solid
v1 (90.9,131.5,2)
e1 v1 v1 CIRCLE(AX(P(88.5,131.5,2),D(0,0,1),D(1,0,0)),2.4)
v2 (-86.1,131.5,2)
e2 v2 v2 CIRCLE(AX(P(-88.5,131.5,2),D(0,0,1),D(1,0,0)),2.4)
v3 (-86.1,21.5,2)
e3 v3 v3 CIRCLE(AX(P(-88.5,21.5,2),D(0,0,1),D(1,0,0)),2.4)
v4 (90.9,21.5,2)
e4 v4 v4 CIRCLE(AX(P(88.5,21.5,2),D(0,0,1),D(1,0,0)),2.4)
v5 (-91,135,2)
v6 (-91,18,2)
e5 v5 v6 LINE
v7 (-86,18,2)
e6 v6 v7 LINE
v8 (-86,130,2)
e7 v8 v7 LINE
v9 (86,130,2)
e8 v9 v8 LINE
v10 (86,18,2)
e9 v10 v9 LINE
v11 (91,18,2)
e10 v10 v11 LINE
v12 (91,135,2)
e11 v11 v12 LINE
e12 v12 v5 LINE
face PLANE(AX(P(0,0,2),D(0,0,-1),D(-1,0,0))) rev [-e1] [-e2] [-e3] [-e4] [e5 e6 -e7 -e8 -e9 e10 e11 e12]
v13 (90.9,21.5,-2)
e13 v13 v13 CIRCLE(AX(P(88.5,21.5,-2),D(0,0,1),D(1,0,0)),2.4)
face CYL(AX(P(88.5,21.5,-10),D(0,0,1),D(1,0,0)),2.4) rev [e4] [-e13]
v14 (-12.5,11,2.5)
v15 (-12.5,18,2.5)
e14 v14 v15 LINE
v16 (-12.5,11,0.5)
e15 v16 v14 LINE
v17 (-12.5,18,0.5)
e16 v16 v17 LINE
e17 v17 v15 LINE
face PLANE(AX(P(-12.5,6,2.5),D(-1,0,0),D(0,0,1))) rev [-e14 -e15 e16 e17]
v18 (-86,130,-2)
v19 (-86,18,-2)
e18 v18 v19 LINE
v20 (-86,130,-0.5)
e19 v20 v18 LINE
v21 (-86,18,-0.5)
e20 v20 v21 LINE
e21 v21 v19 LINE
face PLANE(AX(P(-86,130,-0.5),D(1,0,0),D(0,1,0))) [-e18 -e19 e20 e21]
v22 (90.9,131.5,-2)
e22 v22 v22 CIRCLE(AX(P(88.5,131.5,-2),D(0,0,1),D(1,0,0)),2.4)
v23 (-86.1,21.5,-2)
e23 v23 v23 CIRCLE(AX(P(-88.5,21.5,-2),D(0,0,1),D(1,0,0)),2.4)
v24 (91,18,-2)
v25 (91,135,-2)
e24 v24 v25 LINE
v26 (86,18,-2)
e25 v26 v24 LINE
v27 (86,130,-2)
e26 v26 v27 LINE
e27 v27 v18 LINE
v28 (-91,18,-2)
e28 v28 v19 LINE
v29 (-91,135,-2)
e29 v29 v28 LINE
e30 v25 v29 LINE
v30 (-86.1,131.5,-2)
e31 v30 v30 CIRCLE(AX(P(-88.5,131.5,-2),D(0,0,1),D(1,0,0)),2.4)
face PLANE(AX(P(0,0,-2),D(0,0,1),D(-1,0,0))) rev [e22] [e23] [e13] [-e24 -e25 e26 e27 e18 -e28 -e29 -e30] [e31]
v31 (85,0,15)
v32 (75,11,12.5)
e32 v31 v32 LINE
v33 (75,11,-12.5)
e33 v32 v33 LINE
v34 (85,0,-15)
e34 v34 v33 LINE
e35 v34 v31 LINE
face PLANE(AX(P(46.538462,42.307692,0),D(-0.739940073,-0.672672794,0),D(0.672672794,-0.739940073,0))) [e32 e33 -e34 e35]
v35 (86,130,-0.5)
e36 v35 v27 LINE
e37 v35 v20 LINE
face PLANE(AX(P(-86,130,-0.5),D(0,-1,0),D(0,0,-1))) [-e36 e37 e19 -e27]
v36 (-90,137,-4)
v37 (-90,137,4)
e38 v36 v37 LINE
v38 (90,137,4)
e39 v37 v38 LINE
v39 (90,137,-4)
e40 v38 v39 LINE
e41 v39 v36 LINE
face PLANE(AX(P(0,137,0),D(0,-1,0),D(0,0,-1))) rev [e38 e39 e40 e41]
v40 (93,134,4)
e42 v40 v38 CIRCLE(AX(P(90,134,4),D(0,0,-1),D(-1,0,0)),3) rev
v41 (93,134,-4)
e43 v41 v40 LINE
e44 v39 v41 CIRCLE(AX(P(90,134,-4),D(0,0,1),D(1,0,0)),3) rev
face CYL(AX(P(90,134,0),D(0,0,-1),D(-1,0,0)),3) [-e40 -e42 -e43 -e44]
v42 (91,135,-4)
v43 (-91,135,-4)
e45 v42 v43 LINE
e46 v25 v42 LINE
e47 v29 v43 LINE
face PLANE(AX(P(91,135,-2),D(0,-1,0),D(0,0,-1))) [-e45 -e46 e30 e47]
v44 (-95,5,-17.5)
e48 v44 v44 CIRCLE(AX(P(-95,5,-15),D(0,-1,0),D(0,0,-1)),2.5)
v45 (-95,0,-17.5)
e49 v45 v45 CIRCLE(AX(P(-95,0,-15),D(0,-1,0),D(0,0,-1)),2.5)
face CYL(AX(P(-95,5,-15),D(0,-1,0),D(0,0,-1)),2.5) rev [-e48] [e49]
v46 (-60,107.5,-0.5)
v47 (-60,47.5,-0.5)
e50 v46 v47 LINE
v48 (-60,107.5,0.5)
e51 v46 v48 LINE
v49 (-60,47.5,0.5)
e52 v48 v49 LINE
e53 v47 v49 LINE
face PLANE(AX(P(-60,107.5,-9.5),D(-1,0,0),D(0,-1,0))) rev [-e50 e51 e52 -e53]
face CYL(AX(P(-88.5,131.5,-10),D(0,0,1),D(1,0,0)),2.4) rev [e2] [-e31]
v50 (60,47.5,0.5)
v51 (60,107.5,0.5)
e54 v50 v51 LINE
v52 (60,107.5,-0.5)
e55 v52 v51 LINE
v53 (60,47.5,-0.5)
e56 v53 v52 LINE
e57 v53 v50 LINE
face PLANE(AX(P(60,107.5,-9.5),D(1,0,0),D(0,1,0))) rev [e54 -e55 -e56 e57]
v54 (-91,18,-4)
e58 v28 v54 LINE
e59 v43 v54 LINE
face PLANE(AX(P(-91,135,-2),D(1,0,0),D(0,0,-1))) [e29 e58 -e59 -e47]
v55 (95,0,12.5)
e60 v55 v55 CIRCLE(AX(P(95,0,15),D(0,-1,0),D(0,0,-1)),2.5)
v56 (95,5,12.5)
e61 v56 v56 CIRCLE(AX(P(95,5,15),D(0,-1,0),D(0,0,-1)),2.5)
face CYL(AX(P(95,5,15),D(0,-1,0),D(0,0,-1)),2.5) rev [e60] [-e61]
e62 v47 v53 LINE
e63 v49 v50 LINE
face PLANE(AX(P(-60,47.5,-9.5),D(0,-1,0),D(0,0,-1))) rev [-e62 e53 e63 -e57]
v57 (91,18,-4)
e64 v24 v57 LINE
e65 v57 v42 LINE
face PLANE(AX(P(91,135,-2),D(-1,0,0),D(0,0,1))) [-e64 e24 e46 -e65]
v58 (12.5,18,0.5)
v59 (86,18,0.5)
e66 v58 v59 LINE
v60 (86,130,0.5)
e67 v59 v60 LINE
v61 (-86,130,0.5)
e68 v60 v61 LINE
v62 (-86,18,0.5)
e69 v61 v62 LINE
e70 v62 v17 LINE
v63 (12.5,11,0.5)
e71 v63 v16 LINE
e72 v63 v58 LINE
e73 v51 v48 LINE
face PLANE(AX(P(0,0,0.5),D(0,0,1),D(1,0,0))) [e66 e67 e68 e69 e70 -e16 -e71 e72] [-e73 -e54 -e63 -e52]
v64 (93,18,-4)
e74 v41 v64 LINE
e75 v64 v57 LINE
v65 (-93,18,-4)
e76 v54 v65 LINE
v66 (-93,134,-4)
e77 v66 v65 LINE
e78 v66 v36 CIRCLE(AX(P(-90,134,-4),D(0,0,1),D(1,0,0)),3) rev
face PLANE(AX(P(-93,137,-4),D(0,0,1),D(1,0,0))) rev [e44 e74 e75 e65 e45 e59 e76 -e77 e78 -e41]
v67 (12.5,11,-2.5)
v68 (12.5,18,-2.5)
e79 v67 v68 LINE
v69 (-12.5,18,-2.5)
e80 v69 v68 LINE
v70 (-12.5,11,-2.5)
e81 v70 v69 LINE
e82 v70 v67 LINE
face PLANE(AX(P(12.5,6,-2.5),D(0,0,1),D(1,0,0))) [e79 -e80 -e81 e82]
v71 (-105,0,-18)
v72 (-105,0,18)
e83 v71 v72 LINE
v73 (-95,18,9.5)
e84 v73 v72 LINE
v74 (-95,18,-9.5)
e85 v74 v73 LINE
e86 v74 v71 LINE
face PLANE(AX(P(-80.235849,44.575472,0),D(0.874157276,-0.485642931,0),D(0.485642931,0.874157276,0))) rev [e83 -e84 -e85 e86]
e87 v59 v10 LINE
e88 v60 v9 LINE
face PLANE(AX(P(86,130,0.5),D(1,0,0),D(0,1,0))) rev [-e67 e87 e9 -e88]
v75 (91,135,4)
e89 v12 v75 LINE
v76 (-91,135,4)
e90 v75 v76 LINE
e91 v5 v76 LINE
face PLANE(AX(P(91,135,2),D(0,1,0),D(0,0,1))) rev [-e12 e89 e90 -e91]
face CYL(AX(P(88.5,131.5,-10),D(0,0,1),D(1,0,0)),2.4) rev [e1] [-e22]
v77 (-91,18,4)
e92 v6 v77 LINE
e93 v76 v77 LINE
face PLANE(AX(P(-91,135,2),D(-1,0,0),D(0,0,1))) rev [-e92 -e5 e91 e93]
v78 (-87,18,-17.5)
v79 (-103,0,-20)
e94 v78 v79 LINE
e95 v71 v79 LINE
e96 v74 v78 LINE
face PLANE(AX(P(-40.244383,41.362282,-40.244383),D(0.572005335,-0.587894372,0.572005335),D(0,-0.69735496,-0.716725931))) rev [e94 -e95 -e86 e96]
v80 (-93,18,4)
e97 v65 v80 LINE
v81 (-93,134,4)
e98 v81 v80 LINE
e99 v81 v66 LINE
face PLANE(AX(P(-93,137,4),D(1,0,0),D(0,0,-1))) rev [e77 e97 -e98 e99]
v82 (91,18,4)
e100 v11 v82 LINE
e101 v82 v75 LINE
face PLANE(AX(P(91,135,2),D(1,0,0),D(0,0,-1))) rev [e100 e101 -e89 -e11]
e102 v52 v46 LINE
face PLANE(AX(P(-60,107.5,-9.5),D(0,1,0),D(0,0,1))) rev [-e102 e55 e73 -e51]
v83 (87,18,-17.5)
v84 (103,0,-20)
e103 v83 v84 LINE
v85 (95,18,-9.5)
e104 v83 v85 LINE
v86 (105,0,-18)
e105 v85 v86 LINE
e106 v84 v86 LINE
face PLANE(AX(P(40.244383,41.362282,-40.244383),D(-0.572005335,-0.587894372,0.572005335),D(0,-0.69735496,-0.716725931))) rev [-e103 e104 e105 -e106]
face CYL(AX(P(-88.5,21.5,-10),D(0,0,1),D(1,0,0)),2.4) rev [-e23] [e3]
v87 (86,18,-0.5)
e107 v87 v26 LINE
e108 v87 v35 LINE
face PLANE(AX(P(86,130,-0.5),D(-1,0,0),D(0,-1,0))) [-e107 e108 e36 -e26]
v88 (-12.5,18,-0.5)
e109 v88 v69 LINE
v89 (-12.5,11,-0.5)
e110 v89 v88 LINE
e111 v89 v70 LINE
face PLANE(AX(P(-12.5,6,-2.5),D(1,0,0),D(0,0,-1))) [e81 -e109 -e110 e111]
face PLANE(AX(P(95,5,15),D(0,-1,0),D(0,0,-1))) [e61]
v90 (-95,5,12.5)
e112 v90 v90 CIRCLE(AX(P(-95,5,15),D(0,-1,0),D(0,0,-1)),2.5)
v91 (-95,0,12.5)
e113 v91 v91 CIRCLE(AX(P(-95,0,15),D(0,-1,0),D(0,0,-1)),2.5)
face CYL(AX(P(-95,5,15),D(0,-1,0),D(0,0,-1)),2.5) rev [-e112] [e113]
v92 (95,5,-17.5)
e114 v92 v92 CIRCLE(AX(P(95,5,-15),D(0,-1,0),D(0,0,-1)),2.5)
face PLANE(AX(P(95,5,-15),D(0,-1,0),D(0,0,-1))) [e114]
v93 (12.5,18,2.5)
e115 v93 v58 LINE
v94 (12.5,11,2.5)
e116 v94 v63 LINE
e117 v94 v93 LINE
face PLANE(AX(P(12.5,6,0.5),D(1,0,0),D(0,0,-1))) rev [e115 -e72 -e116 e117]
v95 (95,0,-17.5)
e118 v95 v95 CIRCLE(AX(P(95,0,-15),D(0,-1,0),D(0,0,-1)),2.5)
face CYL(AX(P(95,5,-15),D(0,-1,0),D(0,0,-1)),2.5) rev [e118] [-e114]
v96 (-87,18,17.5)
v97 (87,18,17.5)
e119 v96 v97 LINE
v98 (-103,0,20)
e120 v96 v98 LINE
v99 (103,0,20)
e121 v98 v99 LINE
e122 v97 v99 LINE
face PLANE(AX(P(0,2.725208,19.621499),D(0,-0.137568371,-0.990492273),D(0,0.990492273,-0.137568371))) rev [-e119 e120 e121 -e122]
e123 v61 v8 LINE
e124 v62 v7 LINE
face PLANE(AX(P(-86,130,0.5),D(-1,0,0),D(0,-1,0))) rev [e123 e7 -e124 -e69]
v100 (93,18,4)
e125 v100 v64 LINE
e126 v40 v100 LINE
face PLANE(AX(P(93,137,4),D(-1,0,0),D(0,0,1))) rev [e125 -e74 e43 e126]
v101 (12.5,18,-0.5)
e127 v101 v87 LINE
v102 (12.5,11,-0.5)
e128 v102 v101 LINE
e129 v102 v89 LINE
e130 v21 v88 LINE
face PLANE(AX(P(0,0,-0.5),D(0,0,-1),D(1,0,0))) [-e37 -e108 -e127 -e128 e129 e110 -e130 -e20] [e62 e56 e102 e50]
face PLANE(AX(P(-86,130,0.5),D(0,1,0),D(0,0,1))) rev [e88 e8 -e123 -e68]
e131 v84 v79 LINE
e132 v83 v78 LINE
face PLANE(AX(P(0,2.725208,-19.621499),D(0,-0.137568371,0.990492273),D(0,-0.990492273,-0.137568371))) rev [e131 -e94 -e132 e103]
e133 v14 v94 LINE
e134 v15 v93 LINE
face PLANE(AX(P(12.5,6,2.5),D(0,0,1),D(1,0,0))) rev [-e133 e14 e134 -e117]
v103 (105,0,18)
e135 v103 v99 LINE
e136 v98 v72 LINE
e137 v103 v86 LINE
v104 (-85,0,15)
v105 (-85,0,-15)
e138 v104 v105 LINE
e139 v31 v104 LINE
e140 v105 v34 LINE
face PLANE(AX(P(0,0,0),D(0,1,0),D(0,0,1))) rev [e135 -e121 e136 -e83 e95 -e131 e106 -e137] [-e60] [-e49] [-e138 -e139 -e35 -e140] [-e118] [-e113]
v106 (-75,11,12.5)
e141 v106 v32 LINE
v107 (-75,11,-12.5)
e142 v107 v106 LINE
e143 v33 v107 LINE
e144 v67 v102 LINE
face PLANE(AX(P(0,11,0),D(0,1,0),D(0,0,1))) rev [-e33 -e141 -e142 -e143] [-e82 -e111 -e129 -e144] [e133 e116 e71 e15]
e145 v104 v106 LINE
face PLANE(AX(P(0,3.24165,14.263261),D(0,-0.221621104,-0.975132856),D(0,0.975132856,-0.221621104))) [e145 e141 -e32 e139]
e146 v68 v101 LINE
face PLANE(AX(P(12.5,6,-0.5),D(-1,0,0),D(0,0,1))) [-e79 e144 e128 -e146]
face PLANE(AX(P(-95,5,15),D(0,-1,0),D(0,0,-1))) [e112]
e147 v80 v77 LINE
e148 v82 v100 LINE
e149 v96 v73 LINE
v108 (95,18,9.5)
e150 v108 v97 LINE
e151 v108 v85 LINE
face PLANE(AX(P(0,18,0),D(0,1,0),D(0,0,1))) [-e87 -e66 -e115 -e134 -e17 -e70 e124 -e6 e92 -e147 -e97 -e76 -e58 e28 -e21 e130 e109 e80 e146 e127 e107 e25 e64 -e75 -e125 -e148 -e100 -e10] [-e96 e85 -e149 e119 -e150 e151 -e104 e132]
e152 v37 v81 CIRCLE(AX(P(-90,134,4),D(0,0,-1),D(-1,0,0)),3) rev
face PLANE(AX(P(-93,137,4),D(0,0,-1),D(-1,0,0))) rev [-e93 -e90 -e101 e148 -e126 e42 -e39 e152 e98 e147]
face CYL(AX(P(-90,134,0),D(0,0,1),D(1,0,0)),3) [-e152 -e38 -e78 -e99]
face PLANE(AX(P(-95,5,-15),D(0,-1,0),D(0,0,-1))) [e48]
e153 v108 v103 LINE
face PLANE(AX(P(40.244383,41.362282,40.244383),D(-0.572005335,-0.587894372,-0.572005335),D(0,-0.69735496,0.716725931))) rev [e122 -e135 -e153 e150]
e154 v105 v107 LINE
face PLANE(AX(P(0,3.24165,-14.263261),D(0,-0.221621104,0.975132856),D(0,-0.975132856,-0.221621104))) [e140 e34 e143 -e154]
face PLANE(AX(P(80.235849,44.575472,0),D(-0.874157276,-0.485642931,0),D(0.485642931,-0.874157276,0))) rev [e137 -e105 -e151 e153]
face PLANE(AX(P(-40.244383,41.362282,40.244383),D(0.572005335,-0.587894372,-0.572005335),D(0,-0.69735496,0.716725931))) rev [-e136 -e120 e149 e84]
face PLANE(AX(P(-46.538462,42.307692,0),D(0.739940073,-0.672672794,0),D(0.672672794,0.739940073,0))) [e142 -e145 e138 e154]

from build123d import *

# Parameters (mm, degrees)
SKETCH_3_W          = 186
SKETCH_3_H          = 8
EXTRUDE_1_DEPTH     = 119
SKETCH_9_R          = 2.5
CUT_EXTRUDE_1_DEPTH = 5
SKETCH_10_W         = 172
SKETCH_10_H         = 112
CUT_EXTRUDE_2_DEPTH = 3.5
SKETCH_11_W         = 120
SKETCH_11_H         = 60
CUT_EXTRUDE_3_DEPTH = 10
SKETCH_12_W         = 182
SKETCH_12_H         = 117
CUT_EXTRUDE_4_DEPTH = 2
SKETCH_15_W         = 25
SKETCH_15_H         = 2
CUT_EXTRUDE_8_DEPTH = 12
SKETCH_13_R         = 2.4
CUT_EXTRUDE_7_DEPTH = 12
MIRROR_START        = -14.334518618
MIRROR_3_DEPTH      = 20.078011551
FILLET_1_R          = 3


# Read off the part's stored shape, not the designer's step: 镜向3
with BuildPart() as part:
    # 草图1 → 放样1 section 0
    with BuildSketch(Plane(origin=(0, 0, 0), x_dir=(1, 0, 0), z_dir=(0, 1, 0))):
        with BuildLine():
            Line((-105, 20), (105, 20))
            Line((105, 20), (105, -20))
            Line((105, -20), (-105, -20))
            Line((-105, -20), (-105, 20))
        make_face()
    # 草图2 → 放样1 section 1
    with BuildSketch(Plane(origin=(0, 18, 0), x_dir=(1, 0, 0), z_dir=(0, 1, 0))):
        with BuildLine():
            Line((-95, 17.5), (95, 17.5))
            Line((95, 17.5), (95, -17.5))
            Line((95, -17.5), (-95, -17.5))
            Line((-95, -17.5), (-95, 17.5))
        make_face()
    loft()

    # 草图3 → 凸台-拉伸1 (add)
    with BuildSketch(Plane(origin=(0, 18, 0), x_dir=(1, 0, 0), z_dir=(0, 1, 0))):
        Rectangle(SKETCH_3_W, SKETCH_3_H)
    extrude(amount=EXTRUDE_1_DEPTH)

    # 草图5 → 切除-放样2 section 0
    with BuildSketch(Plane.XZ):
        with BuildLine():
            Line((-85, 15), (85, 15))
            Line((85, 15), (85, -15))
            Line((85, -15), (-85, -15))
            Line((-85, -15), (-85, 15))
        make_face()
    # 草图7 → 切除-放样2 section 1
    with BuildSketch(Plane(origin=(0, 11, 0), x_dir=(1, 0, 0), z_dir=(0, 1, 0))):
        with BuildLine():
            Line((-75, 12.5), (75, 12.5))
            Line((75, 12.5), (75, -12.5))
            Line((75, -12.5), (-75, -12.5))
            Line((-75, -12.5), (-75, 12.5))
        make_face()
    loft(mode=Mode.SUBTRACT)

    # 草图9 → 切除-拉伸1 (cut)
    with BuildSketch(Plane.XZ):
        with Locations(Location((95, 15, 0), (0, 0, 270))):
            Circle(SKETCH_9_R)
        with Locations(Location((-95, 15, 0), (0, 0, 270))):
            Circle(SKETCH_9_R)
        with Locations(Location((-95, -15, 0), (0, 0, 270))):
            Circle(SKETCH_9_R)
        with Locations(Location((95, -15, 0), (0, 0, 270))):
            Circle(SKETCH_9_R)
    extrude(amount=-CUT_EXTRUDE_1_DEPTH, mode=Mode.SUBTRACT)

    # 草图10 → 切除-拉伸2 (cut)
    with BuildSketch(Plane.XY.offset(4)):
        with Locations((0, 74)):
            Rectangle(SKETCH_10_W, SKETCH_10_H)
    cut_extrude_2 = extrude(amount=-CUT_EXTRUDE_2_DEPTH, mode=Mode.SUBTRACT)

    # 草图11 → 切除-拉伸3 (cut)
    with BuildSketch(Plane.XY.offset(0.5)):
        with Locations((0, 77.5)):
            Rectangle(SKETCH_11_W, SKETCH_11_H)
    extrude(amount=-CUT_EXTRUDE_3_DEPTH, mode=Mode.SUBTRACT)

    # 草图12 → 切除-拉伸4 (cut)
    with BuildSketch(Plane.XY.offset(4)):
        with Locations((0, 76.5)):
            Rectangle(SKETCH_12_W, SKETCH_12_H)
    cut_extrude_4 = extrude(amount=-CUT_EXTRUDE_4_DEPTH, mode=Mode.SUBTRACT)

    # 草图15 → 切除-拉伸8 (cut)
    with BuildSketch(Plane(origin=(0, 18, 0), x_dir=(1, 0, 0), z_dir=(0, 1, 0))):
        with Locations((0, -1.5)):
            Rectangle(SKETCH_15_W, SKETCH_15_H)
    cut_extrude_8 = extrude(amount=-CUT_EXTRUDE_8_DEPTH, mode=Mode.SUBTRACT)

    # 镜向1: 切除-拉伸2, 切除-拉伸4, 切除-拉伸8 across plane
    add(cut_extrude_2.mirror(Plane.XY), mode=Mode.SUBTRACT)
    add(cut_extrude_4.mirror(Plane.XY), mode=Mode.SUBTRACT)
    add(cut_extrude_8.mirror(Plane.XY), mode=Mode.SUBTRACT)

    # 草图13 → 切除-拉伸7 (cut)
    with BuildSketch(Plane.XY.offset(2)):
        with Locations((88.5, 131.5)):
            Circle(SKETCH_13_R)
        with Locations((88.5, 21.5)):
            Circle(SKETCH_13_R)
        with Locations((-88.5, 21.5)):
            Circle(SKETCH_13_R)
        with Locations((-88.5, 131.5)):
            Circle(SKETCH_13_R)
    extrude(amount=-CUT_EXTRUDE_7_DEPTH, mode=Mode.SUBTRACT)

    # 草图17 → 切除-放样3 section 0
    with BuildSketch(Plane(origin=(0, 18, 0), x_dir=(1, 0, 0), z_dir=(0, 1, 0))):
        with BuildLine():
            Line((87, 17.5), (95, 17.5))
            Line((95, 17.5), (95, 9.5))
            Line((95, 9.5), (87, 17.5))
        make_face()
    # 草图18 → 切除-放样3 section 1
    with BuildSketch(Plane(origin=(0, 0, 0), x_dir=(1, 0, 0), z_dir=(0, 1, 0))):
        with BuildLine():
            Line((103, 20), (105, 20))
            Line((105, 20), (105, 18))
            Line((105, 18), (103, 20))
        make_face()
    loft_3 = loft(mode=Mode.SUBTRACT)

    # 镜向2: 切除-放样3 across plane
    add(loft_3.mirror(Plane(origin=(0, 0, 0), x_dir=(0, 0, 1), z_dir=(1, 0, 0))), mode=Mode.SUBTRACT)

    # 镜向3 outline → 镜向3 (cut)
    with BuildSketch(Plane(origin=(0, 0, 0), x_dir=(1, 0, 0), z_dir=(0, 0.6973549598034537, -0.7167259309091051)).offset(MIRROR_START)):
        Polygon((-84.282271503, -27), (-87, -25.104778553), (-105, -12.552389276), (-106, -11.855034316), (-106, -27), align=None)
        Polygon((87, -25.104778553), (84.282271503, -27), (106, -27), (106, -11.855034316), (105, -12.552389276), align=None)
    extrude(amount=MIRROR_3_DEPTH, mode=Mode.SUBTRACT)

    # 圆角1
    fillet_1_edges = [part.edges().sort_by_distance(p)[0] for p in [
        (93, 137, 0),
        (-93, 137, 0),
    ]]
    fillet(fillet_1_edges, radius=FILLET_1_R)


solid = part.part
